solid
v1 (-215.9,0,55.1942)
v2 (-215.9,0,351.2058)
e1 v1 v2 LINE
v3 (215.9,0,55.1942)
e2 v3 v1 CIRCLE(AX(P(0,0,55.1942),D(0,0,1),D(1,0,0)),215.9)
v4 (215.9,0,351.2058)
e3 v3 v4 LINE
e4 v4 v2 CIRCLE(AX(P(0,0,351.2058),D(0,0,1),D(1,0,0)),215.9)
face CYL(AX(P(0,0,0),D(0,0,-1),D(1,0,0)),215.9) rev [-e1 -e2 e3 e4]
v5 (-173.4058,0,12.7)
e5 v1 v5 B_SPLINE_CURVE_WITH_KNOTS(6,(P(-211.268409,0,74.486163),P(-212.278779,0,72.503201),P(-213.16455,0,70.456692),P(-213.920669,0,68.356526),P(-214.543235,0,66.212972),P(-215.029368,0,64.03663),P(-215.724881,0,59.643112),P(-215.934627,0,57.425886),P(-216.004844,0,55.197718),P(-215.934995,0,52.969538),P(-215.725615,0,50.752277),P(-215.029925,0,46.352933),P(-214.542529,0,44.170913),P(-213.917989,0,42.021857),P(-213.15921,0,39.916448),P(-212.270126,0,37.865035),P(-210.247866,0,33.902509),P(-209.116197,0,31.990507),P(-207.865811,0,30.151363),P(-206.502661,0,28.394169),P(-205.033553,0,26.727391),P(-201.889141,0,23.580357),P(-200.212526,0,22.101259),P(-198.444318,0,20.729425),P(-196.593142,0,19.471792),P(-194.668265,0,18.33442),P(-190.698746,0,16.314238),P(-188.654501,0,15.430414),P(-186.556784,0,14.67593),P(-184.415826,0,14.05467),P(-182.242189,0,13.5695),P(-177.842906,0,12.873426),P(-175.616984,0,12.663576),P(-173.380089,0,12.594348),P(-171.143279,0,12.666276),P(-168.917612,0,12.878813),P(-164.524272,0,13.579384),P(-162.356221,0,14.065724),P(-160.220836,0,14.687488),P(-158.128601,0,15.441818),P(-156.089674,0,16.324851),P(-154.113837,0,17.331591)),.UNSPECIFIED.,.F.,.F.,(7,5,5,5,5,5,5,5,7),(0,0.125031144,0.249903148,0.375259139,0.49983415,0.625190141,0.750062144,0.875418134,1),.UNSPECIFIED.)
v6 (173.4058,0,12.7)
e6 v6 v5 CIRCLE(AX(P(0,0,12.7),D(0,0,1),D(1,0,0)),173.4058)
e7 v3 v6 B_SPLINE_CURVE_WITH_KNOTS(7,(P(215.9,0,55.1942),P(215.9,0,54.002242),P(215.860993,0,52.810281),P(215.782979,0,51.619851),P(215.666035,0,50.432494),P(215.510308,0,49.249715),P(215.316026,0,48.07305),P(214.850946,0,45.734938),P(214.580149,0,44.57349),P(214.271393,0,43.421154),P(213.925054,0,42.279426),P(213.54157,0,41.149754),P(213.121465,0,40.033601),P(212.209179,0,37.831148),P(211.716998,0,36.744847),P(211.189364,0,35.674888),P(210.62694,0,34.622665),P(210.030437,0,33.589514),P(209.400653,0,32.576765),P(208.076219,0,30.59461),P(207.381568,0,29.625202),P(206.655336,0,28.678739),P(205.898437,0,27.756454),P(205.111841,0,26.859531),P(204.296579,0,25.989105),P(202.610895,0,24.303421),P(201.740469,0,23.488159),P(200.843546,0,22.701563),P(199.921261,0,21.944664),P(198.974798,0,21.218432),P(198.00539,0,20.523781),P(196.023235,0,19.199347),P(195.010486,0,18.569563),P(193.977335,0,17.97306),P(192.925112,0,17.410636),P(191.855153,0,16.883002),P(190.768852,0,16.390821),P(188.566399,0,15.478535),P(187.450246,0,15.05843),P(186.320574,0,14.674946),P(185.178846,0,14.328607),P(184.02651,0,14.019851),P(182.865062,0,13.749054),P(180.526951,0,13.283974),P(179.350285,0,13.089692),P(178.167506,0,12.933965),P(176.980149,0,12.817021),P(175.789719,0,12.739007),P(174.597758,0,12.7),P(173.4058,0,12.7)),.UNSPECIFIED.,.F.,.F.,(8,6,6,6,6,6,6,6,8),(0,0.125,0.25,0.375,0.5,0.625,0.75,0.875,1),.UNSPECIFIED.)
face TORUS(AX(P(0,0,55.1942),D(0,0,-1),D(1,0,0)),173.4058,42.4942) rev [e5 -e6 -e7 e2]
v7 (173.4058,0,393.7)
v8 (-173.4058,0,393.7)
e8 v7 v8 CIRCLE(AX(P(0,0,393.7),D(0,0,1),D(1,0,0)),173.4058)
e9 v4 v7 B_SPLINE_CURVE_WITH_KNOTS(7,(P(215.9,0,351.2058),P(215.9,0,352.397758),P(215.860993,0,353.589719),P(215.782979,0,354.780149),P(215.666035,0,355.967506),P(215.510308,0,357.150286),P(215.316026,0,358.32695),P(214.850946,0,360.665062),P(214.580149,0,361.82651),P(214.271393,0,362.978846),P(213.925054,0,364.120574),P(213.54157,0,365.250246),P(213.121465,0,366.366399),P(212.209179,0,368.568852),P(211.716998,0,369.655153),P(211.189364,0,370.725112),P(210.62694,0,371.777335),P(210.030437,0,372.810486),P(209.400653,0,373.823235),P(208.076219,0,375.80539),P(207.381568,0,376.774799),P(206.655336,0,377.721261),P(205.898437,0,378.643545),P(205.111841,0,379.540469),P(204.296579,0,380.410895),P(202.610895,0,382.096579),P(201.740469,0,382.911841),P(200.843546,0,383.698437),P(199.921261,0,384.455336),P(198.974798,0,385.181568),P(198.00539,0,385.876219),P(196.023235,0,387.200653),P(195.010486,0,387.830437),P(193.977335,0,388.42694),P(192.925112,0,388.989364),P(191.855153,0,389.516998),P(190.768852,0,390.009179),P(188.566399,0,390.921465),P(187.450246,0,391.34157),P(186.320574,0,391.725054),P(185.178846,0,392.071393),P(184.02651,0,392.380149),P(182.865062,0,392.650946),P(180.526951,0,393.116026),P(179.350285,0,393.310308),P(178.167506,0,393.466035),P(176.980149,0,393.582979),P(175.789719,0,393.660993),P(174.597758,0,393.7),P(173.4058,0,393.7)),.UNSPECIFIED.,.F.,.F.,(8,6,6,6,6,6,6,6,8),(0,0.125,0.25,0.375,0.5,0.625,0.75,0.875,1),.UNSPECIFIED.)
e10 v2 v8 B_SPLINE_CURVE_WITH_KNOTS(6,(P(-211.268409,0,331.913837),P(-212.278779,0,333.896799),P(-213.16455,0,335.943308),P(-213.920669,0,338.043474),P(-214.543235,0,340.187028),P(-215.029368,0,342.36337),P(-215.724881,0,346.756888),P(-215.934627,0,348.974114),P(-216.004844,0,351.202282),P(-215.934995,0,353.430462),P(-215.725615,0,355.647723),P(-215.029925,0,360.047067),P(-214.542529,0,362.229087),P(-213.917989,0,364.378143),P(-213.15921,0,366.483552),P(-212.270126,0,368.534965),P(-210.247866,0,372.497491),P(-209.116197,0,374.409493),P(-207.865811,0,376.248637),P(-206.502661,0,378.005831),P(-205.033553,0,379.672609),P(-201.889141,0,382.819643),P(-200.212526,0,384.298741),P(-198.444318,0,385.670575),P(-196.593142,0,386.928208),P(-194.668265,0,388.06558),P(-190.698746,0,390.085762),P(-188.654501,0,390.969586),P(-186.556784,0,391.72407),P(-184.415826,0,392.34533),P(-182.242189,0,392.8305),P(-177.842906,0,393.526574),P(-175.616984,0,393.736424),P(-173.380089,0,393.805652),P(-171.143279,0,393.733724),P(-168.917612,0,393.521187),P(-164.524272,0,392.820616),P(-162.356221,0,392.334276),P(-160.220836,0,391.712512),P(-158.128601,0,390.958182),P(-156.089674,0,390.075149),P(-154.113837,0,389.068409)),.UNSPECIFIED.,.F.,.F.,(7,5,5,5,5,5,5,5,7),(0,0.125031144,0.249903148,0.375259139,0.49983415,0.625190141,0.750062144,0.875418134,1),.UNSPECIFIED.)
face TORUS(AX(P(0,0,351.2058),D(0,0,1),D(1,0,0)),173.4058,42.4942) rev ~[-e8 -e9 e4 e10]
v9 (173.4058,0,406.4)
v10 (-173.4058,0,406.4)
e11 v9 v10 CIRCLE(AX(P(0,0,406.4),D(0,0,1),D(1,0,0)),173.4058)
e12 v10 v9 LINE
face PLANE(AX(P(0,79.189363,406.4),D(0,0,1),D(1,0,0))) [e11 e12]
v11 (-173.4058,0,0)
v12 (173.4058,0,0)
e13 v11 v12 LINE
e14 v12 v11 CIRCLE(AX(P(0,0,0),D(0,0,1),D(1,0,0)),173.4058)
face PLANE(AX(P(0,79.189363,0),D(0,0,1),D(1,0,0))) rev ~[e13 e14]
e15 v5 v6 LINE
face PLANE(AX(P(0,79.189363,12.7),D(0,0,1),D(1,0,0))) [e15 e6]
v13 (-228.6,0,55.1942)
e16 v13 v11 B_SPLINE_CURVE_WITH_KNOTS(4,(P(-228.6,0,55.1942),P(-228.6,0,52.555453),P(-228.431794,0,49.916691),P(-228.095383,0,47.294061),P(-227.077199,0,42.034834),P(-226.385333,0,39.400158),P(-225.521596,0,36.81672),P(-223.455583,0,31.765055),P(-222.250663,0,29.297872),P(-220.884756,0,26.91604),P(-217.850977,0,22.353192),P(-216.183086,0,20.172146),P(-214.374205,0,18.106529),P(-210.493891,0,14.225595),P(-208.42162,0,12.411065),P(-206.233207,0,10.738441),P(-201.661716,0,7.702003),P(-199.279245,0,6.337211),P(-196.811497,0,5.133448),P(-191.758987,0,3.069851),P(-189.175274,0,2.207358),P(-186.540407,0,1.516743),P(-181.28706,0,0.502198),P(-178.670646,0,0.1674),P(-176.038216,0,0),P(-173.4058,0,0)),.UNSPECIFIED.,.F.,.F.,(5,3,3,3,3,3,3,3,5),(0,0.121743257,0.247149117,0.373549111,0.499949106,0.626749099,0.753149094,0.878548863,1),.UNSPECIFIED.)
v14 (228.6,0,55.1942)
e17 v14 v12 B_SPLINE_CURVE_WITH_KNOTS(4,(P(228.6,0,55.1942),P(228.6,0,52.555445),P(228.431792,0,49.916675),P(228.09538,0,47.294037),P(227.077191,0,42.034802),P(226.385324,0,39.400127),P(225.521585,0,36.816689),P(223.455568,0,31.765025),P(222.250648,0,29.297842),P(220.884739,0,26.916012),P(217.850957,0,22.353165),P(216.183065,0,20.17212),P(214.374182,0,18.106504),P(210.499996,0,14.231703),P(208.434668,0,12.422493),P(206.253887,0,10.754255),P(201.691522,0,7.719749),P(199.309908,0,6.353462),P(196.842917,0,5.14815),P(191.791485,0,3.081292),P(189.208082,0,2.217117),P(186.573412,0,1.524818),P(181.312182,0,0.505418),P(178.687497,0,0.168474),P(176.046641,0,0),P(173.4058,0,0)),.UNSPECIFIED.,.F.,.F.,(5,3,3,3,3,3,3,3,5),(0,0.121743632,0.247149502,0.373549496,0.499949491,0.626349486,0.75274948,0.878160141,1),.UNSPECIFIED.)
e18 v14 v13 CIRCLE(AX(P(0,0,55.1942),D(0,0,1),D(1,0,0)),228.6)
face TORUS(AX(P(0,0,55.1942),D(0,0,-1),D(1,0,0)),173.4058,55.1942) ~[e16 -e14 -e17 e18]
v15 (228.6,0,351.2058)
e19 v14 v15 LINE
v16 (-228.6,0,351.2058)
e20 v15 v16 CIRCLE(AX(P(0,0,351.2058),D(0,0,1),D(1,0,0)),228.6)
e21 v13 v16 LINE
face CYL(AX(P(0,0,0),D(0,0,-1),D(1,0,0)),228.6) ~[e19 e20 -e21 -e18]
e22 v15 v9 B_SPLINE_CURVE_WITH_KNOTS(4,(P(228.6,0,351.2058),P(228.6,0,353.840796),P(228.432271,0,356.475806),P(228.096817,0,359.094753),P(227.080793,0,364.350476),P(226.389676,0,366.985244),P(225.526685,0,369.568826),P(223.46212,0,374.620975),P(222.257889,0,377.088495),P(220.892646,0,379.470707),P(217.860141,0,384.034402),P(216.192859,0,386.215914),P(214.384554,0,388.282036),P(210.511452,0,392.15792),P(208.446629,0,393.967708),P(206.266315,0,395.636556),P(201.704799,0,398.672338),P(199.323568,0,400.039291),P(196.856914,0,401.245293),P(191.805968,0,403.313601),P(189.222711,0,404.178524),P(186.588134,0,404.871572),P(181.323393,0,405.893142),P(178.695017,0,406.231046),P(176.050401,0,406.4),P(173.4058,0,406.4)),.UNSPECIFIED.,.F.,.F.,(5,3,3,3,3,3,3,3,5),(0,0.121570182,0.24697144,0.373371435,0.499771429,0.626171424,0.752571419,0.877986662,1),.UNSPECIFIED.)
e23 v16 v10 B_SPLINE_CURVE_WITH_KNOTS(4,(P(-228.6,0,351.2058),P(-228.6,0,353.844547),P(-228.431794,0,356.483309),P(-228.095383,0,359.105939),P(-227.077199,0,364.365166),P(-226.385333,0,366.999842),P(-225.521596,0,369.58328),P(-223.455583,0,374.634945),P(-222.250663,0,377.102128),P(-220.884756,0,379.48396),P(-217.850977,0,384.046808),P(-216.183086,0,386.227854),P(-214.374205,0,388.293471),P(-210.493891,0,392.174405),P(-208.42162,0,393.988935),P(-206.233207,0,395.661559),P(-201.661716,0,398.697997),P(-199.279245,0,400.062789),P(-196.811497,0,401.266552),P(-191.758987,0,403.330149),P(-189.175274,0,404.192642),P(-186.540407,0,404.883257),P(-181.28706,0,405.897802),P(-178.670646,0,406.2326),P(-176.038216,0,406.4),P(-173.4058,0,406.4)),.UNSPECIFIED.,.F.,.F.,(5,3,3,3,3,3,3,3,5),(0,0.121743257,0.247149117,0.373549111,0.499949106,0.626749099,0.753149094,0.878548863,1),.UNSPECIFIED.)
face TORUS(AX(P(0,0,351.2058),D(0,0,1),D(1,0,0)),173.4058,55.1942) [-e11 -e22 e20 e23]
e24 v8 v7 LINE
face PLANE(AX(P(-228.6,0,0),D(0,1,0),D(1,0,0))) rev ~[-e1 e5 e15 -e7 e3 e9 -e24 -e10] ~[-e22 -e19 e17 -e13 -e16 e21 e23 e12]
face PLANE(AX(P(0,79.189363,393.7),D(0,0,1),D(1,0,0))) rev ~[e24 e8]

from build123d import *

# Parameters (mm, degrees)
F1_DEPTH = 406.4
F2_R     = 55.1942
F4_T     = -12.7


# Not quite as in the source:
# - two fillets or chamfers of one size are made in one step


with BuildPart() as f1:
    # F0 (on Top) → F1 (new body)
    with BuildSketch(Plane.XY):
        with BuildLine():
            ThreePointArc((228.6, 0), (0, 228.6), (-228.6, 0))
            Line((-228.6, 0), (228.6, 0))
        make_face()
    extrude(amount=F1_DEPTH)

    # F2
    f2_edges = [f1.edges().sort_by_distance(p)[0] for p in [
        (0, 228.6, 406.4),
        (0, 228.6, 0),
    ]]
    fillet(f2_edges, radius=F2_R)

    # F4
    f4_openings = [f1.faces().sort_by_distance(p)[0] for p in [
        (0, 0, 203.2),
    ]]
    offset(amount=F4_T, openings=f4_openings)


solid = f1.part
